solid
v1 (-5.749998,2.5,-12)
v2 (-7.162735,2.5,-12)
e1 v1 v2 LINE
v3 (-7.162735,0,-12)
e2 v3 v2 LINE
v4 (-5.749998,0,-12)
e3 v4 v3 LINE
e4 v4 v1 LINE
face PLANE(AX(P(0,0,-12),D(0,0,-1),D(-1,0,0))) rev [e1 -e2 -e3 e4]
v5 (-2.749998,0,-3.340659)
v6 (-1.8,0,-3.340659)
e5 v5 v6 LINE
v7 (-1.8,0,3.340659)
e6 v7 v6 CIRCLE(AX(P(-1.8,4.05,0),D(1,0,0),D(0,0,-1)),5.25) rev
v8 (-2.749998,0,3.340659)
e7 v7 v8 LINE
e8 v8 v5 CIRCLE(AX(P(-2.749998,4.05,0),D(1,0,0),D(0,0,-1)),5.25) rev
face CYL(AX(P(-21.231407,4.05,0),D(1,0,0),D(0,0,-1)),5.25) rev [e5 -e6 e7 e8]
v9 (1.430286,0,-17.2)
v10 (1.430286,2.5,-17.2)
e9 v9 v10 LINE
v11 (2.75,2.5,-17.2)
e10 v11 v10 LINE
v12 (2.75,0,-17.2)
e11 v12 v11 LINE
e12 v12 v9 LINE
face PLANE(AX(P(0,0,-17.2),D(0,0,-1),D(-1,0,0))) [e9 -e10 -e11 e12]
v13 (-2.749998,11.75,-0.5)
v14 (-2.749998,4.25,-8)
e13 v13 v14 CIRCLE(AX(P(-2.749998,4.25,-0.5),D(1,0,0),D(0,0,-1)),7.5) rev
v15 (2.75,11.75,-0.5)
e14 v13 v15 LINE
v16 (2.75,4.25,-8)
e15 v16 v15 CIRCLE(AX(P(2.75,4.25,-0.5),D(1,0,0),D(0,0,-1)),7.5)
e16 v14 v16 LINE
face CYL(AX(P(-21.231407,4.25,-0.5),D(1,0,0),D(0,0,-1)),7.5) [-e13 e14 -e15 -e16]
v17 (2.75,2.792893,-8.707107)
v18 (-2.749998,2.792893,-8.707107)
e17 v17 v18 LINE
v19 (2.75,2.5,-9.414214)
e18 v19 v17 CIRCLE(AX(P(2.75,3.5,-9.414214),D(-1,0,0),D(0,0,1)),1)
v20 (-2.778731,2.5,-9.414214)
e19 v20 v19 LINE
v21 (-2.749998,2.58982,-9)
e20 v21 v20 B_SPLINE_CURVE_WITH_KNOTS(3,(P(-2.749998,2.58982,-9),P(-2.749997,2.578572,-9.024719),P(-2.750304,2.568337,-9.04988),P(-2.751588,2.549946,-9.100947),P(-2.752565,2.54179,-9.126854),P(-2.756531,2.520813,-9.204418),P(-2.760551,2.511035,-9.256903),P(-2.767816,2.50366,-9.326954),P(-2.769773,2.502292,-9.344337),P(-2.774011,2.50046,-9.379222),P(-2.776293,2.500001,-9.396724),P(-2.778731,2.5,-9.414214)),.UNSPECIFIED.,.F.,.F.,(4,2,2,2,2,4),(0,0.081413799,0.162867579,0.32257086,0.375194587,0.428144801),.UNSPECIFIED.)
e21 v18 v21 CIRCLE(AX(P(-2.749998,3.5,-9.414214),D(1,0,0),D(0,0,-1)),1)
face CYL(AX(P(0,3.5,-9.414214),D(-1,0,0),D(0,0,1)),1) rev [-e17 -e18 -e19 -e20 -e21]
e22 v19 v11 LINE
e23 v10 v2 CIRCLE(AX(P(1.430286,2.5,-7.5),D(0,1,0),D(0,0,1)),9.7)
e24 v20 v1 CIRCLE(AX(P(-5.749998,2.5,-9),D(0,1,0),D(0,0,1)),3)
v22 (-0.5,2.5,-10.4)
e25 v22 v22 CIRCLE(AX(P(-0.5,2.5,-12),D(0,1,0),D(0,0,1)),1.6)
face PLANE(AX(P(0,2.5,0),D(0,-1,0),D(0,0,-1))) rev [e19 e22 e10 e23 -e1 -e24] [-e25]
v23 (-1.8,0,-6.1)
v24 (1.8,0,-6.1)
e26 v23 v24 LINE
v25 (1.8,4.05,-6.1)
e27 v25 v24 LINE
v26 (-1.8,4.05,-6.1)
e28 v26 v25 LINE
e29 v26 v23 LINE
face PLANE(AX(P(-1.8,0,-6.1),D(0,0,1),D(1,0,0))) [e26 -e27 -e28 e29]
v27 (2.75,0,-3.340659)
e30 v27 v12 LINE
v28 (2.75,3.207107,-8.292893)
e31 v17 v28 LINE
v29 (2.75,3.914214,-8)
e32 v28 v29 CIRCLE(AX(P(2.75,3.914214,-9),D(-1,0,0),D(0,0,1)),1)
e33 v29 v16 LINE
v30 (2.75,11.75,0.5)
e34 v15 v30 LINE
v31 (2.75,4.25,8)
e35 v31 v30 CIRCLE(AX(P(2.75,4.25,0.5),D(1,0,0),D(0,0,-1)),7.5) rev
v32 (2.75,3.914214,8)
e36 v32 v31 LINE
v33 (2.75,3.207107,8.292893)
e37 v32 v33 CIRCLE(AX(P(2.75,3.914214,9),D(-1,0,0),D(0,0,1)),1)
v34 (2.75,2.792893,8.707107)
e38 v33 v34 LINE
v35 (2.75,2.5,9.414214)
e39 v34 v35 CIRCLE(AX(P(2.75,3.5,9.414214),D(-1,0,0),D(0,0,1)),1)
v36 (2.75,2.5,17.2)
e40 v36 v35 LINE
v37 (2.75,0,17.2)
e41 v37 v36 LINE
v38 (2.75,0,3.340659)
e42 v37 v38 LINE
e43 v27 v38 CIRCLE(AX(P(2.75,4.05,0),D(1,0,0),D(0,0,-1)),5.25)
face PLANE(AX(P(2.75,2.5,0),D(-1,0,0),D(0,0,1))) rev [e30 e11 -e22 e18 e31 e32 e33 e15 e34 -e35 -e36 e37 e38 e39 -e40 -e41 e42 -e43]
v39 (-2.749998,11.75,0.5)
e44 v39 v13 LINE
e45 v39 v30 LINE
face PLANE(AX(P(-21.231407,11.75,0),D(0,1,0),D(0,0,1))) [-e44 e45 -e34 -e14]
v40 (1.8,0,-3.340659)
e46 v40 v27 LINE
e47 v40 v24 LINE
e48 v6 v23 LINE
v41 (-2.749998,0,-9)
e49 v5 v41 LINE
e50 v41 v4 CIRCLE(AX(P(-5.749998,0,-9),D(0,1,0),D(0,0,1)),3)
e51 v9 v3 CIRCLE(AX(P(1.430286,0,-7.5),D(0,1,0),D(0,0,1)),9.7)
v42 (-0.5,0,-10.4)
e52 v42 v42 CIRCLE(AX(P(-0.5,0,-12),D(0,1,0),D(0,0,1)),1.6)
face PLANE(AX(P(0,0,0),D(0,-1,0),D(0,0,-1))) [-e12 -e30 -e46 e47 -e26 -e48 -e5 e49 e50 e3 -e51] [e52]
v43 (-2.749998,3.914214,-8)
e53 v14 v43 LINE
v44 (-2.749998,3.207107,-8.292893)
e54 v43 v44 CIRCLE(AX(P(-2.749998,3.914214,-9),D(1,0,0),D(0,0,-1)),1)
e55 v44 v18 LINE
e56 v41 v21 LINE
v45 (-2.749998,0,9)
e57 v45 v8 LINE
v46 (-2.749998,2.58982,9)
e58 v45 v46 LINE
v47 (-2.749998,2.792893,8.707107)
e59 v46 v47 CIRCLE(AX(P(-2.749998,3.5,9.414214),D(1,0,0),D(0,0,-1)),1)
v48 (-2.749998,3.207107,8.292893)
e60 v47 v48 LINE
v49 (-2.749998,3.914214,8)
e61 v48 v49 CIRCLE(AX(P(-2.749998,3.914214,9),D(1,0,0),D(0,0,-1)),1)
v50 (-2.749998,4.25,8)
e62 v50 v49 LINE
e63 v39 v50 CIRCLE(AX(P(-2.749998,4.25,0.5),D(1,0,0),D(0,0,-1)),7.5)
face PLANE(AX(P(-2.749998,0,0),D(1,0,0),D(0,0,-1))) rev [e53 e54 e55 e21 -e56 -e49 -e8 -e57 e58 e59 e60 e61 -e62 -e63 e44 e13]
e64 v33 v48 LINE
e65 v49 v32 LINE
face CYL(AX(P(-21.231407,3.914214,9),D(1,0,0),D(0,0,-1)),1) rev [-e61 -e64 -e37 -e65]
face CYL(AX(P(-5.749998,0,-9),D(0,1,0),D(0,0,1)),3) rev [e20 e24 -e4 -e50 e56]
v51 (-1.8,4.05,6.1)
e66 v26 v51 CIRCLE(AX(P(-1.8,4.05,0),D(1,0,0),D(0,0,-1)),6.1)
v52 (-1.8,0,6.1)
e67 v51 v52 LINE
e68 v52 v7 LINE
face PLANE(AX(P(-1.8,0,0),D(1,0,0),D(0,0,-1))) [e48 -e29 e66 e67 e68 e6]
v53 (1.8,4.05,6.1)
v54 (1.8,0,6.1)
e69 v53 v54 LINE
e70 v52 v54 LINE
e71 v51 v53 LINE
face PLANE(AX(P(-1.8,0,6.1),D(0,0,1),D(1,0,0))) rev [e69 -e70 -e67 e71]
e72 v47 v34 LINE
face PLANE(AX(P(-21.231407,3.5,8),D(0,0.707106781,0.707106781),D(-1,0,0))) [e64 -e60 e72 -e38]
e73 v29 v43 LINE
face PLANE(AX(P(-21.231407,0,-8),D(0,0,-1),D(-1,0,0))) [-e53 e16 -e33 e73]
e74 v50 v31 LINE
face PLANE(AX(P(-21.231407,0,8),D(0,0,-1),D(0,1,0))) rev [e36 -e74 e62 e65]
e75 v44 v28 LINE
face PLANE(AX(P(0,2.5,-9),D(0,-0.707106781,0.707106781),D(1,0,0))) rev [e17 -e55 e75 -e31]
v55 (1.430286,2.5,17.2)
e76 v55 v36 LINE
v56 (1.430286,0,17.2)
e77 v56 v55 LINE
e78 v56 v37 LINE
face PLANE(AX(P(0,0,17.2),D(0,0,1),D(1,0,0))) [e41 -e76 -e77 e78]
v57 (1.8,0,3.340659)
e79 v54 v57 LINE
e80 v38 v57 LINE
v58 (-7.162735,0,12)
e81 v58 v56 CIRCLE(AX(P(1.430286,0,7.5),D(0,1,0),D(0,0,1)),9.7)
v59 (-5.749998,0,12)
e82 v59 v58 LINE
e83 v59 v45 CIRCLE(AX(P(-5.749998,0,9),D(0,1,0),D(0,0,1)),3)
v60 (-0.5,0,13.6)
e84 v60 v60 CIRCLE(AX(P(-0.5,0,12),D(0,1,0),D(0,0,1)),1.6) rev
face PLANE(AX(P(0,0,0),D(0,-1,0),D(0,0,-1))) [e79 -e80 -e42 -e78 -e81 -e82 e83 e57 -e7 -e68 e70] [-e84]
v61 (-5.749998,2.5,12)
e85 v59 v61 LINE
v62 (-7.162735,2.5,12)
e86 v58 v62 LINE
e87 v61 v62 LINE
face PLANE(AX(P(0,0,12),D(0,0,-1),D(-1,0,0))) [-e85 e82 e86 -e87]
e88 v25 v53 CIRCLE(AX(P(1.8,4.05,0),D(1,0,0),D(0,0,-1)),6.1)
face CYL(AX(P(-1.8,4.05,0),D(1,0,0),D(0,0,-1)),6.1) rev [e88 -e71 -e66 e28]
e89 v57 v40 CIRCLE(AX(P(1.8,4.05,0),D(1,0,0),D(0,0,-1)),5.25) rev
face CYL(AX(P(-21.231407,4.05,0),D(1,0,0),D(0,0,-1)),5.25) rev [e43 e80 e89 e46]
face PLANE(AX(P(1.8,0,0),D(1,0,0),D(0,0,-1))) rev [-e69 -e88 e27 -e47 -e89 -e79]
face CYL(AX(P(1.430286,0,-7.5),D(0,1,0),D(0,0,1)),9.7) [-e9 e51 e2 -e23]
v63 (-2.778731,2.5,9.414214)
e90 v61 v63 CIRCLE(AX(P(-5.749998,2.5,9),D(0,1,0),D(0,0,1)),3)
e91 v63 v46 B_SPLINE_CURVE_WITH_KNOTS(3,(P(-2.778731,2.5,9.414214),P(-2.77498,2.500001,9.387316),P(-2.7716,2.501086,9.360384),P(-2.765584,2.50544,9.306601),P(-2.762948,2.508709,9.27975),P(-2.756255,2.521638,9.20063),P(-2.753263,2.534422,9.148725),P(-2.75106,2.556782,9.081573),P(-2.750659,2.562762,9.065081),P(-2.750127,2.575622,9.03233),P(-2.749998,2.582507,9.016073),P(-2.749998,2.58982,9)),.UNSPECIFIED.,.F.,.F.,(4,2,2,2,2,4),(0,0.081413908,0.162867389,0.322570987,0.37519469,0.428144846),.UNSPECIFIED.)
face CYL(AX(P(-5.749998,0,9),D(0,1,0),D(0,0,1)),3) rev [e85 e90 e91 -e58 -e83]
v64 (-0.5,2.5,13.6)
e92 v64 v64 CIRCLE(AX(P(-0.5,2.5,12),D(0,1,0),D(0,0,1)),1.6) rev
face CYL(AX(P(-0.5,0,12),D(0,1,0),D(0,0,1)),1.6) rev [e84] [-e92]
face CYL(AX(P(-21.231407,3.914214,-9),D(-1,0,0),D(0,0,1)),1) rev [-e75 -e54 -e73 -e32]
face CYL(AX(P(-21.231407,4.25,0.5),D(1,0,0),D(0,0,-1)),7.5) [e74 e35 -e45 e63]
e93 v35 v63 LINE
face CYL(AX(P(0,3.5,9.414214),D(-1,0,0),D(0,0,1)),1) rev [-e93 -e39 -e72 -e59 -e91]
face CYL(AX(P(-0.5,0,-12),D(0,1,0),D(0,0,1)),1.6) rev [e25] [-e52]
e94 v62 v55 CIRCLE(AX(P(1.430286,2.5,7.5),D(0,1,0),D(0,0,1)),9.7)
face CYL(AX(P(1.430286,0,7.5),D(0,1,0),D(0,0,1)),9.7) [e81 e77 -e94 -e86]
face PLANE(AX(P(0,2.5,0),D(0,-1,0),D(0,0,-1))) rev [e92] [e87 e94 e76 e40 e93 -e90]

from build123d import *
from build123d.topology import SkipClean

# Parameters (mm, degrees)
SKETCH1_W               = 15
SKETCH1_H               = 35
BOSS_EXTRUDE1_DEPTH     = 2.5
CUT_EXTRUDE2_DEPTH      = 20.20286437
CUT_EXTRUDE2_DEPTH_BACK = 20.20286437
SKETCH3_W               = 4.75
SKETCH3_H               = 35
CUT_EXTRUDE3_DEPTH      = 20.20286437
FILLET1_R               = 10
CUT_EXTRUDE5_DEPTH      = 20.20286437
SKETCH7_R               = 1.6
CUT_EXTRUDE6_DEPTH      = 19.798797059
BOSS_EXTRUDE2_DEPTH     = 5.499997748
CUT_EXTRUDE7_START      = -0.95
CUT_EXTRUDE7_DEPTH      = 3.6
SKETCH11_R              = 5.25
CUT_EXTRUDE8_DEPTH      = 24.068697681
CHAMFER1_SIZE           = 1
FILLET2_R               = 1


with BuildPart() as part:
    # Sketch1 → Boss-Extrude1 (new body)
    with BuildSketch(Plane(origin=(0, 0, 0), x_dir=(1, 0, 0), z_dir=(0, 1, 0))):
        Rectangle(SKETCH1_W, SKETCH1_H)
    extrude(amount=BOSS_EXTRUDE1_DEPTH)

    # Sketch3 → Cut-Extrude2 (cut, two sides: drawn at the far end of the back side and taken through both)
    with BuildSketch(Plane.XZ.offset(-CUT_EXTRUDE2_DEPTH_BACK)):
        with Locations((5.125, 0)):
            Rectangle(SKETCH3_W, SKETCH3_H)
    extrude(amount=CUT_EXTRUDE2_DEPTH + CUT_EXTRUDE2_DEPTH_BACK, mode=Mode.SUBTRACT)

    # Sketch5 → Cut-Extrude3 (cut, through all)
    with BuildSketch(Plane(origin=(0, 2.5, 0), x_dir=(1, 0, 0), z_dir=(0, 1, 0))):
        with BuildLine():
            Line((-5.749997748, -12), (-10.249997748, -12))
            ThreePointArc((-10.249997748, -12), (-12.371318091, -11.121320344), (-13.249997748, -9))
            Line((-13.249997748, -9), (-13.249997748, 9))
            ThreePointArc((-13.249997748, 9), (-12.371318091, 11.121320344), (-10.249997748, 12))
            Line((-10.249997748, 12), (-5.749997748, 12))
            ThreePointArc((-5.749997748, 12), (-3.628677404, 11.121320344), (-2.749997748, 9))
            Line((-2.749997748, 9), (-2.749997748, -9))
            ThreePointArc((-2.749997748, -9), (-3.628677404, -11.121320344), (-5.749997748, -12))
        make_face()
    extrude(amount=-CUT_EXTRUDE3_DEPTH, mode=Mode.SUBTRACT)

    # Fillet1
    # the kernel refuses this fillet: 10 mm, written as the material it takes off along each edge
    with BuildSketch(Plane(origin=(-7.5, -22.325713874, 17.5), x_dir=(1, 0, 0), z_dir=(0, 1, 0))) as fillet1_piece_1:
        with BuildLine():
            CenterArc((8.93028555, 10), FILLET1_R, 206.74368395, 63.25631605)
            Line((0, 5.5), (-0.178605711, 5.41))
            ThreePointArc((-0.178605711, 5.41), (-0.2, 2.75), (-0.2, 0))
            Line((-0.2, 0), (0, -0.2))
            Line((0, -0.2), (8.93028555, -0.2))
            Line((8.93028555, -0.2), (8.93028555, 0))
        make_face()
    extrude(amount=47.151427749, mode=Mode.SUBTRACT)
    with BuildSketch(Plane(origin=(-7.5, -22.325713874, -17.5), x_dir=(1, 0, 0), z_dir=(0, 1, 0))) as fillet1_piece_2:
        with BuildLine():
            CenterArc((8.93028555, -10), FILLET1_R, 90, 63.25631605)
            Line((0, -5.5), (-0.178605711, -5.41))
            ThreePointArc((-0.178605711, -5.41), (-0.2, -2.75), (-0.2, 0))
            Line((-0.2, 0), (0, 0.2))
            Line((0, 0.2), (8.93028555, 0.2))
            Line((8.93028555, 0.2), (8.93028555, 0))
        make_face()
    extrude(amount=47.151427749, mode=Mode.SUBTRACT)

    # Sketch6 → Cut-Extrude5 (cut, through all)
    with BuildSketch(Plane(origin=(0, 2.5, 0), x_dir=(1, 0, 0), z_dir=(0, 1, 0))):
        with BuildLine():
            Line((1.43028555, 17.2), (2.75, 17.2))
            Line((2.75, 17.2), (2.75, 17.5))
            Line((2.75, 17.5), (1.43028555, 17.5))
            ThreePointArc((1.43028555, 17.5), (-3.813758691, 16.014693183), (-7.5, 12))
            Line((-7.5, 12), (-7.162734874, 12))
            ThreePointArc((-7.162734874, 12), (-3.591666262, 15.798795093), (1.43028555, 17.2))
        make_face()
        with BuildLine():
            Line((2.75, -17.5), (2.75, -17.2))
            Line((2.75, -17.2), (1.43028555, -17.2))
            ThreePointArc((1.43028555, -17.2), (-3.591666262, -15.798795093), (-7.162734874, -12))
            Line((-7.162734874, -12), (-7.5, -12))
            ThreePointArc((-7.5, -12), (-3.813758691, -16.014693183), (1.43028555, -17.5))
            Line((1.43028555, -17.5), (2.75, -17.5))
        make_face()
    extrude(amount=-CUT_EXTRUDE5_DEPTH, mode=Mode.SUBTRACT)

    # Sketch7 → Cut-Extrude6 (cut, through all)
    with BuildSketch(Plane(origin=(0, 2.5, 0), x_dir=(1, 0, 0), z_dir=(0, 1, 0))):
        with Locations(Location((-0.5, 12, 0), (0, 0, 270))):
            Circle(SKETCH7_R)
        with Locations(Location((-0.5, -12, 0), (0, 0, 270))):
            Circle(SKETCH7_R)
    extrude(amount=-CUT_EXTRUDE6_DEPTH, mode=Mode.SUBTRACT)

    # Sketch9 → Boss-Extrude2 (add)
    with BuildSketch(Plane(origin=(2.75, 0, 0), x_dir=(0, 0, -1), z_dir=(1, 0, 0))):
        with BuildLine():
            Line((-8, 2.5), (-5.015974482, 2.5))
            ThreePointArc((-5.015974482, 2.5), (-0.783783762, 9.241163936), (5.25, 4.05))
            ThreePointArc((5.25, 4.05), (5.191163936, 3.266216238), (5.015974482, 2.5))
            Line((5.015974482, 2.5), (8, 2.5))
            Line((8, 2.5), (8, 4.25))
            ThreePointArc((8, 4.25), (5.803300859, 9.553300859), (0.5, 11.75))
            Line((0.5, 11.75), (-0.5, 11.75))
            ThreePointArc((-0.5, 11.75), (-5.803300859, 9.553300859), (-8, 4.25))
            Line((-8, 4.25), (-8, 2.5))
        make_face()
    extrude(amount=-BOSS_EXTRUDE2_DEPTH)

    # Sketch10 → Cut-Extrude7 (cut)
    with BuildSketch(Plane(origin=(2.75, 0, 0), x_dir=(0, 0, -1), z_dir=(1, 0, 0)).offset(CUT_EXTRUDE7_START)):
        with BuildLine():
            ThreePointArc((6.1, 4.05), (0, 10.15), (-6.1, 4.05))
            ThreePointArc((-6.1, 4.05), (-5.70242473, 1.883816212), (-4.561523868, 0))
            Line((-4.561523868, 0), (-3.340658618, 0))
            ThreePointArc((-3.340658618, 0), (-4.361287561, 1.127386305), (-5.015974482, 2.5))
            ThreePointArc((-5.015974482, 2.5), (-0.783783762, 9.241163936), (5.25, 4.05))
            ThreePointArc((5.25, 4.05), (5.191163936, 3.266216238), (5.015974482, 2.5))
            ThreePointArc((5.015974482, 2.5), (4.361287561, 1.127386305), (3.340658618, 0))
            Line((3.340658618, 0), (4.561523868, 0))
            ThreePointArc((4.561523868, 0), (5.70242473, 1.883816212), (6.1, 4.05))
        make_face()
        with BuildLine():
            ThreePointArc((-4.561523868, 0), (-5.70242473, 1.883816212), (-6.1, 4.05))
            Line((-6.1, 4.05), (-6.1, 0))
            Line((-6.1, 0), (-4.561523868, 0))
        make_face()
        with BuildLine():
            Line((6.1, 0), (6.1, 4.05))
            ThreePointArc((6.1, 4.05), (5.70242473, 1.883816212), (4.561523868, 0))
            Line((4.561523868, 0), (6.1, 0))
        make_face()
    extrude(amount=-CUT_EXTRUDE7_DEPTH, mode=Mode.SUBTRACT)

    # Sketch11 → Cut-Extrude8 (cut, through all)
    with SkipClean():  # the faces are left unmerged after this step: merging them gives an invalid solid
        with BuildSketch(Plane(origin=(2.75, 0, 0), x_dir=(0, 0, -1), z_dir=(1, 0, 0))):
            with Locations((0, 4.05)):
                Circle(SKETCH11_R)
        extrude(amount=-CUT_EXTRUDE8_DEPTH, mode=Mode.SUBTRACT)

    # Chamfer1
    chamfer1_edges = [part.edges().sort_by_distance(p)[0] for p in [
        (1.126e-06, 2.5, 8),
        (1.126e-06, 2.5, -8),
    ]]
    chamfer(chamfer1_edges, length=CHAMFER1_SIZE)

    # Fillet2
    fillet2_edges = [part.edges().sort_by_distance(p)[0] for p in [
        (1.126e-06, 3.5, 8),
        (1.126e-06, 2.5, 9),
        (1.126e-06, 2.5, -9),
        (1.126e-06, 3.5, -8),
    ]]
    fillet(fillet2_edges, radius=FILLET2_R)


solid = part.part
